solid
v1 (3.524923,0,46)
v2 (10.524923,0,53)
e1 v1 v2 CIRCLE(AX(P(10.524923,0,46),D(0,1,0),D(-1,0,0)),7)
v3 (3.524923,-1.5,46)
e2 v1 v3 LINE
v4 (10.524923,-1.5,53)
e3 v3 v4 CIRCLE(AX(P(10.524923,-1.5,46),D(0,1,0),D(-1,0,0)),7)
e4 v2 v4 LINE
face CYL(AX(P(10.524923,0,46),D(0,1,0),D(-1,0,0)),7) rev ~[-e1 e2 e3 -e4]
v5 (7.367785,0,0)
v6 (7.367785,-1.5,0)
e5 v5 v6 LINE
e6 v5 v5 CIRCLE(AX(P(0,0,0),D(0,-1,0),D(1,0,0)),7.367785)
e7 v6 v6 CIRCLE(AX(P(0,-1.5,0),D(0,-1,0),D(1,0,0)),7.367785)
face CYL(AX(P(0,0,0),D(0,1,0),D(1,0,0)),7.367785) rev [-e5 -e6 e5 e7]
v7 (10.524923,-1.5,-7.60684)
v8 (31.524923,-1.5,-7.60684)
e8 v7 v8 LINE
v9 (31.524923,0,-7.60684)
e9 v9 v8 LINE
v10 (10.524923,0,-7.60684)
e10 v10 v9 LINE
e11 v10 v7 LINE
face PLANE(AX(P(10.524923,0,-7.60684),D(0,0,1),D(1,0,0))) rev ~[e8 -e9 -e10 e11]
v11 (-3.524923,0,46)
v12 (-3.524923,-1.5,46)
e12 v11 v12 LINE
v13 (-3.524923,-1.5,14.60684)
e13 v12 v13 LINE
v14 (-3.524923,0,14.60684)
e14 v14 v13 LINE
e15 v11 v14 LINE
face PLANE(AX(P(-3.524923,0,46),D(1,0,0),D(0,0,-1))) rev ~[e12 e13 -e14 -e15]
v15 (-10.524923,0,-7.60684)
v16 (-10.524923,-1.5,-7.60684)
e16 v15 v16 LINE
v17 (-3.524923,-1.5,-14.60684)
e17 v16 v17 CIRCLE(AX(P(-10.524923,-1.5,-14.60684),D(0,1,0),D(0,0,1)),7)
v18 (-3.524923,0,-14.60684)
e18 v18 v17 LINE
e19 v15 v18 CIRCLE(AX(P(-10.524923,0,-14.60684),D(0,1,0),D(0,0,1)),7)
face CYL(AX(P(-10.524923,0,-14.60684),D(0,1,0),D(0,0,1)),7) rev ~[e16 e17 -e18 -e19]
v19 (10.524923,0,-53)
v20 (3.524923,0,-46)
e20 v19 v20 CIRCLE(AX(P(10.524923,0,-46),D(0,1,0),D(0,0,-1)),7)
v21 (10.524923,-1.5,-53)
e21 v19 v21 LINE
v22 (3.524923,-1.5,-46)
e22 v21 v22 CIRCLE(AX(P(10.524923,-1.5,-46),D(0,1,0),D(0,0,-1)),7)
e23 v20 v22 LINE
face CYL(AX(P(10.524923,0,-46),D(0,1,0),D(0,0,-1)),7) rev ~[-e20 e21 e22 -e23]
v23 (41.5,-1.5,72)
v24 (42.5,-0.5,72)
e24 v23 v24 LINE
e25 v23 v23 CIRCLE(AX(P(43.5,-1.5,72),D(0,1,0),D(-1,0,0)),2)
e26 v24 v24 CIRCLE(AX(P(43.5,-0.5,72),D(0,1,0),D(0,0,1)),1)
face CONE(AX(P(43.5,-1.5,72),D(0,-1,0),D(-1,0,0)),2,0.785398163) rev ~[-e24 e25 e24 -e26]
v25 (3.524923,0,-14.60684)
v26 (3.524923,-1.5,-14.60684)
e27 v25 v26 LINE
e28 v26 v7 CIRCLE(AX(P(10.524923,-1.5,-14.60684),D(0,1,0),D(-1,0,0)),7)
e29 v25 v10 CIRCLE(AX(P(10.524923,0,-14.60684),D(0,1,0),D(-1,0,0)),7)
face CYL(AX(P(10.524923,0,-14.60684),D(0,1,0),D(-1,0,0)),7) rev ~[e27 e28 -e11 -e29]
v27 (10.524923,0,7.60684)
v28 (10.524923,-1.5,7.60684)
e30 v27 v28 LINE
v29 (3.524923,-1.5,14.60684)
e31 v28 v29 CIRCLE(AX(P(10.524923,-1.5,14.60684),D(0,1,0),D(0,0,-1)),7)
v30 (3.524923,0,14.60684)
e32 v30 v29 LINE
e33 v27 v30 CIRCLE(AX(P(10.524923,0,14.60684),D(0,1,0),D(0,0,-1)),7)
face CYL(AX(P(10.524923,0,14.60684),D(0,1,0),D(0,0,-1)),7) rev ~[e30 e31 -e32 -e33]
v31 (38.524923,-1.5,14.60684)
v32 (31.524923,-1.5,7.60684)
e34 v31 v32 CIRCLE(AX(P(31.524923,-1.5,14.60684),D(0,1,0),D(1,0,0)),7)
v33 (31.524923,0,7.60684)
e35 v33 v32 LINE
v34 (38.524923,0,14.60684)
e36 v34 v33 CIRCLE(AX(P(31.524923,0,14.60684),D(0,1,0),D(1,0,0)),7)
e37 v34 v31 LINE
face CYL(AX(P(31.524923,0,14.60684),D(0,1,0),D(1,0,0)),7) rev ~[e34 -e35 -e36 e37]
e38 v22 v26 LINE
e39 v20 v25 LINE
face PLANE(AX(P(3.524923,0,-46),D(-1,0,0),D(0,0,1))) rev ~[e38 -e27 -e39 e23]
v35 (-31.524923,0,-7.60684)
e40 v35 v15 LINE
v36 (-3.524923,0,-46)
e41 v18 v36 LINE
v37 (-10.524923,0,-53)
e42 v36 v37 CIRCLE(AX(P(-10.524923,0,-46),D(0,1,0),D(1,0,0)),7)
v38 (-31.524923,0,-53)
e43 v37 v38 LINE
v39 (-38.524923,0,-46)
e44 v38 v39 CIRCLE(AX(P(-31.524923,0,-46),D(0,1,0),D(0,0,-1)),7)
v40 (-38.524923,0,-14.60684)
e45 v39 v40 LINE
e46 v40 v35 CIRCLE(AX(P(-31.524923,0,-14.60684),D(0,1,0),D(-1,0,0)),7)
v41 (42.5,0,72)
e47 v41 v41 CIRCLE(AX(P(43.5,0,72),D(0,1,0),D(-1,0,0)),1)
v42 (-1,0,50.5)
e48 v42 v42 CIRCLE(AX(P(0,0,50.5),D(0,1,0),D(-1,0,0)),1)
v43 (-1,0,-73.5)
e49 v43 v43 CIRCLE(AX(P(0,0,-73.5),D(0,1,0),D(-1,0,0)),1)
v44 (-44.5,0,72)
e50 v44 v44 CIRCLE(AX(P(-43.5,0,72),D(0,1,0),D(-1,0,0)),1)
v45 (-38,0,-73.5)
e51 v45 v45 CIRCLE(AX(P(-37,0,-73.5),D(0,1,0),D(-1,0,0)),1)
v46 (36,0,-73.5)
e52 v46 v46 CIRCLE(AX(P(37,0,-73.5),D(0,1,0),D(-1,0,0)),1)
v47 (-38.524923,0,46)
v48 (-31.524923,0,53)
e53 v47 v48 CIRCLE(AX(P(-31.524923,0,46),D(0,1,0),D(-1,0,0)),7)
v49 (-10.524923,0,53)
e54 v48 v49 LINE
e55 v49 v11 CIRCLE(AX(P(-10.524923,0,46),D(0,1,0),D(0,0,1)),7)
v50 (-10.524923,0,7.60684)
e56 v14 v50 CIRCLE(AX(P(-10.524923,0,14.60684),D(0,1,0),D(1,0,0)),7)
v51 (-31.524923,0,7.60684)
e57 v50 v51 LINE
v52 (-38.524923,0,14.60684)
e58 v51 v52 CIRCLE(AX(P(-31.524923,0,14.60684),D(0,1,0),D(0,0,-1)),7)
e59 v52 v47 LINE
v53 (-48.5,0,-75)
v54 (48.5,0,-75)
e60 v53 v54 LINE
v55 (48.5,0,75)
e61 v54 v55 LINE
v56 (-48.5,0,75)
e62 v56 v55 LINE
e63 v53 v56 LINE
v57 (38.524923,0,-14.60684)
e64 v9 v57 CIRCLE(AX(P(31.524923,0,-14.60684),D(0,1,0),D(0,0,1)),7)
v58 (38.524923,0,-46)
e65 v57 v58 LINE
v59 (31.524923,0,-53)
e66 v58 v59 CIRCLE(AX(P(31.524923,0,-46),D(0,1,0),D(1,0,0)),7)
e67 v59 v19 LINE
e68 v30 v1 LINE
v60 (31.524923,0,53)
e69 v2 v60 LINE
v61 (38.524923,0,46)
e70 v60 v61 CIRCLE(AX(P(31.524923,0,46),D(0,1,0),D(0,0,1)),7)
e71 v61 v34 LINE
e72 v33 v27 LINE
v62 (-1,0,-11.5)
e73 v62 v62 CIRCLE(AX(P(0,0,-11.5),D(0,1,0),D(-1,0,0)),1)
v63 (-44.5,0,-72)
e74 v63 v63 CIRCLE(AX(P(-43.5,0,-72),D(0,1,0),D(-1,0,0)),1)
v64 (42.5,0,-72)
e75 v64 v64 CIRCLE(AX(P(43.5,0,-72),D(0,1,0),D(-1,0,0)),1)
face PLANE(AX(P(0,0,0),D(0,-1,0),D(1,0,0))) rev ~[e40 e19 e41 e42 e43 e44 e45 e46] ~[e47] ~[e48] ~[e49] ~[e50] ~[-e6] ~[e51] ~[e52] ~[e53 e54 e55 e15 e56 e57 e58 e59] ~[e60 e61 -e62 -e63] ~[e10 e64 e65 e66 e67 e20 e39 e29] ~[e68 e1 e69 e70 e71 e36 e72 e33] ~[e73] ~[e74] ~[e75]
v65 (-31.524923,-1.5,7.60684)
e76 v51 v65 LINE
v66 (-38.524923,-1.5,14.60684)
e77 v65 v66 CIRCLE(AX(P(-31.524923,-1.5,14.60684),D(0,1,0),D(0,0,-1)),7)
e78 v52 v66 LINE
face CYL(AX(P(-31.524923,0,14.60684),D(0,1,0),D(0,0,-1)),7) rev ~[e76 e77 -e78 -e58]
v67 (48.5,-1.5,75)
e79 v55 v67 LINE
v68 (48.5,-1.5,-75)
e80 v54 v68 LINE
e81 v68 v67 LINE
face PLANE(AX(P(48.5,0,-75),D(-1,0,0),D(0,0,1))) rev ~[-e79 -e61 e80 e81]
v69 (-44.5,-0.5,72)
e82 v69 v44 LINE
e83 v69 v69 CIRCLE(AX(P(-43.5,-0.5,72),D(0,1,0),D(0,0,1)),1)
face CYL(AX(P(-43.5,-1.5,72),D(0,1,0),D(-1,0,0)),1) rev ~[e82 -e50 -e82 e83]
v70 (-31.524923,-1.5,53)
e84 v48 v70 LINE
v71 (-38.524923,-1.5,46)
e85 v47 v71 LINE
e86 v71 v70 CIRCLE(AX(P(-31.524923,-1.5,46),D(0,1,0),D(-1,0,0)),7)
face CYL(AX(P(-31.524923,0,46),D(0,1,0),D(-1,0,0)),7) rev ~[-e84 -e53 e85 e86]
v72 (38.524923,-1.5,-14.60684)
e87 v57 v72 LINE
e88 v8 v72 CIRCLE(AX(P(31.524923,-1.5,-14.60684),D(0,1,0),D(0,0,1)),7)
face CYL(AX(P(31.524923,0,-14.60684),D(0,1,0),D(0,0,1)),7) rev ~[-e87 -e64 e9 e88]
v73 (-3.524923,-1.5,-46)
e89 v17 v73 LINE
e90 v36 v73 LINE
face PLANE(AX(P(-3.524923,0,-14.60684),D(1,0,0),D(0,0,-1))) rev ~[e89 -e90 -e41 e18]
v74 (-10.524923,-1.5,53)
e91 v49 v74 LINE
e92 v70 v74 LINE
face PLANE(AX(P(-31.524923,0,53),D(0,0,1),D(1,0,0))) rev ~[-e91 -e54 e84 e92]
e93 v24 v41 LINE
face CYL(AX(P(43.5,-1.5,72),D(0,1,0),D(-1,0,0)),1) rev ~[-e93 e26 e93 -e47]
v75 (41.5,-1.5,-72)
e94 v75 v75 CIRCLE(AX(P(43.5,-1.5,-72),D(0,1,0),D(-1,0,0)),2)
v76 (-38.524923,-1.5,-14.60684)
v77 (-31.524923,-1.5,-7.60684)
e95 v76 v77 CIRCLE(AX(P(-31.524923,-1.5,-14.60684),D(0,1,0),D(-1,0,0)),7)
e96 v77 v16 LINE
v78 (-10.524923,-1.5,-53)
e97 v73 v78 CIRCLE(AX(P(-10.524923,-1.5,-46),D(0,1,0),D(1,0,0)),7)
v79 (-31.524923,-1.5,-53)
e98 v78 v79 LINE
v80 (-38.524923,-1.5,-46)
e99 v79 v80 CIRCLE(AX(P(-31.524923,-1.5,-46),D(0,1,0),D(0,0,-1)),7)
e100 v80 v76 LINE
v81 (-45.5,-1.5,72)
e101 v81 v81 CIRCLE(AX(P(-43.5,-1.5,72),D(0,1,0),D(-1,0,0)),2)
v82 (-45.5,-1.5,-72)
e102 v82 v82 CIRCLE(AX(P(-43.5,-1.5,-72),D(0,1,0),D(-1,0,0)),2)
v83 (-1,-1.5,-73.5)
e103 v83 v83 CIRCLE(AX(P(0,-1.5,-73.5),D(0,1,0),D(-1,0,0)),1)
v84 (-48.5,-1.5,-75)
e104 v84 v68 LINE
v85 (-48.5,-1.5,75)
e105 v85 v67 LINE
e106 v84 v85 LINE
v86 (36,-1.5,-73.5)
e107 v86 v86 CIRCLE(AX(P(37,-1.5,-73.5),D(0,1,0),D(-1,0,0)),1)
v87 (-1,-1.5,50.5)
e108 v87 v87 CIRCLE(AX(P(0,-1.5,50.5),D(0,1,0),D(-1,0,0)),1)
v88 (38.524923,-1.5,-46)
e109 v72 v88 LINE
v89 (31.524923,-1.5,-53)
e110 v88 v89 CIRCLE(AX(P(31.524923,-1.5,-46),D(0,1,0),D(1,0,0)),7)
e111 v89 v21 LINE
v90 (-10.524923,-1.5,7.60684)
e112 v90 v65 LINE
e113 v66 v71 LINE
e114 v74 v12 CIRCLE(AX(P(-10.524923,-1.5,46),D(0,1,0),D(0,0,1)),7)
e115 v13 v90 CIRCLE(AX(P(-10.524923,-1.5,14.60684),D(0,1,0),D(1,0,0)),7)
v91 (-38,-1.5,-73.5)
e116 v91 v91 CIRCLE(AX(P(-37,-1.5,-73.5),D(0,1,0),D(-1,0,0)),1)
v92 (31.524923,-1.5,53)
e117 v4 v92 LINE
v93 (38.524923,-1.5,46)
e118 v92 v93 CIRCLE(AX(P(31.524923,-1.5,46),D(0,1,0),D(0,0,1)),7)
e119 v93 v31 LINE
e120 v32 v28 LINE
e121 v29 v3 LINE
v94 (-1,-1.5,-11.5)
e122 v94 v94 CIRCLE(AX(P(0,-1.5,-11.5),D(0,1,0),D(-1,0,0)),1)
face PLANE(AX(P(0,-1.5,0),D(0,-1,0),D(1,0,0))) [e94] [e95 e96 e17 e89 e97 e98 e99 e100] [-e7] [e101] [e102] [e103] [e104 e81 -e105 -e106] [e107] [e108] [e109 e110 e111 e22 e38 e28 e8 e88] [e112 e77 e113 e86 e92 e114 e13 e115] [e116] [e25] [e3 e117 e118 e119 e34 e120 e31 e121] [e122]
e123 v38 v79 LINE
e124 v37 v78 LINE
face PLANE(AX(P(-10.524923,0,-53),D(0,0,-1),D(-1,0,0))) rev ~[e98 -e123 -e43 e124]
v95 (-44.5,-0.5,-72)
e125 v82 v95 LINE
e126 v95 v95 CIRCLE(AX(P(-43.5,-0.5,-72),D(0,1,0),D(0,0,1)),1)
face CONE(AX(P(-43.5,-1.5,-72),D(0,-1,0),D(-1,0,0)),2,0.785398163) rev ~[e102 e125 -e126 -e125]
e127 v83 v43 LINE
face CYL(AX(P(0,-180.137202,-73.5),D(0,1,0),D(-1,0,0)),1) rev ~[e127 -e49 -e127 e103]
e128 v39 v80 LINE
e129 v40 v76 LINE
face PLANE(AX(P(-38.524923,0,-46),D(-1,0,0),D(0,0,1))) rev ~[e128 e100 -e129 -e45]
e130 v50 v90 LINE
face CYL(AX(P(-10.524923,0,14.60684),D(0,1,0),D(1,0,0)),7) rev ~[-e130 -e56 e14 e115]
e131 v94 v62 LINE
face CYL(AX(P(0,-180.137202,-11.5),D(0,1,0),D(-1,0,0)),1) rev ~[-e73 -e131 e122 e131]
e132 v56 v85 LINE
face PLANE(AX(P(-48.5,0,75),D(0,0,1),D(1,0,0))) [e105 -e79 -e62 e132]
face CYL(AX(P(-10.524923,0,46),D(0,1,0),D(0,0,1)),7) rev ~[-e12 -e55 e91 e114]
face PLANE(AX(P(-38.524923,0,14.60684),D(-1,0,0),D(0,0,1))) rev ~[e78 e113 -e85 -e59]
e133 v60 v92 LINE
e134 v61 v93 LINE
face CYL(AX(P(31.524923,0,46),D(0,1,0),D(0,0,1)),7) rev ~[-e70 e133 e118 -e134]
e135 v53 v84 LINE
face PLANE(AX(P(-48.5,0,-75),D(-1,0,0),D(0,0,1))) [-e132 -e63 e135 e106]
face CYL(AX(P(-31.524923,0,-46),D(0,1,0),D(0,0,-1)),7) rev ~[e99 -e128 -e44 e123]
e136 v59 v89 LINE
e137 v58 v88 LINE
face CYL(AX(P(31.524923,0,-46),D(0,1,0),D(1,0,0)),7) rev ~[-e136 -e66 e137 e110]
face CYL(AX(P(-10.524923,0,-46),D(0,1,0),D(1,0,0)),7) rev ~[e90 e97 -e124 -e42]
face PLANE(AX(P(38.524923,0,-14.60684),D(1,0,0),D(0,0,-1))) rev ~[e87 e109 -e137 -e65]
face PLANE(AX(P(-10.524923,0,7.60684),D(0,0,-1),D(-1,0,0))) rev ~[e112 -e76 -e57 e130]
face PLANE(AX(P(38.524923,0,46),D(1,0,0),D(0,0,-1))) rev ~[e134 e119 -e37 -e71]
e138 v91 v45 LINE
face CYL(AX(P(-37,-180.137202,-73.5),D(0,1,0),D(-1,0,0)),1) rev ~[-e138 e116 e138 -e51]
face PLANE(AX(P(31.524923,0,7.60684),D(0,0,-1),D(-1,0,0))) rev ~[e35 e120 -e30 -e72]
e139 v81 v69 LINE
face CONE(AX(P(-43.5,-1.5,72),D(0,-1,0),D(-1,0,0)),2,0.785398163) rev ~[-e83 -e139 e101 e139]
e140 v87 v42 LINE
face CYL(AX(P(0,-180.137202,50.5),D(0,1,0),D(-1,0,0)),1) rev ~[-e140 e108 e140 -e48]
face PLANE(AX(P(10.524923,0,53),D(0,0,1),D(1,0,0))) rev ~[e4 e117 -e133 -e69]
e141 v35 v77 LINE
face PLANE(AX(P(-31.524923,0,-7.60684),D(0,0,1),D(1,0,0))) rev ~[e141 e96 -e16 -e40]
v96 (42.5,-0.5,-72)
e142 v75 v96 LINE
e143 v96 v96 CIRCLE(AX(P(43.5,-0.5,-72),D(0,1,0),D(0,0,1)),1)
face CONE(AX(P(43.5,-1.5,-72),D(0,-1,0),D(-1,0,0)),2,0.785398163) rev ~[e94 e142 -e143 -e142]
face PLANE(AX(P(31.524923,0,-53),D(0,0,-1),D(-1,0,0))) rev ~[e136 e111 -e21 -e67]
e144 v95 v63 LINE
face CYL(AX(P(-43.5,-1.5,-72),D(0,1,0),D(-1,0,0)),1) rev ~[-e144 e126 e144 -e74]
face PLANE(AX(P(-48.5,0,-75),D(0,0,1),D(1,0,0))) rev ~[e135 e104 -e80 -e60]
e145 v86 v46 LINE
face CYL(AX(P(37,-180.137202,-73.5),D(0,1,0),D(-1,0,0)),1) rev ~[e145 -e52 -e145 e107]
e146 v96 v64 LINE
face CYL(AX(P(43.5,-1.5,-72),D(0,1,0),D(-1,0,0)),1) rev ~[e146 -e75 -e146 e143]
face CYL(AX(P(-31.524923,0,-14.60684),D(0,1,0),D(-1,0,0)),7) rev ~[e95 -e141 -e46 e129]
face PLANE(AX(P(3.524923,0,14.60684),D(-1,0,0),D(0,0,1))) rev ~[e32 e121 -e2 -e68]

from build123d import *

# Parameters (mm, degrees)
F0_W           = 97
F0_H           = 150
F0_R           = 7.367785
F1_DEPTH       = 1.5
F3_D           = 2
F3_CSINK_D     = 4
F3_CSINK_ANGLE = 90
F5_D           = 2


# Not quite as in the source:
# - a feature names something its author has since deleted; it is built from what else it names


with BuildPart() as f1:
    # F0 (on Front) → F1 (new body)
    with BuildSketch(Plane.XZ):
        Rectangle(F0_W, F0_H)
        with BuildLine():
            Line((-31.5249225795, -7.60684), (-10.5249225795, -7.60684))
            ThreePointArc((-10.5249225795, -7.60684), (-5.5751751112, -9.6570925317), (-3.5249225795, -14.60684))
            Line((-3.5249225795, -14.60684), (-3.5249225795, -46))
            ThreePointArc((-3.5249225795, -46), (-5.5751751112, -50.9497474683), (-10.5249225795, -53))
            Line((-10.5249225795, -53), (-31.5249225795, -53))
            ThreePointArc((-31.5249225795, -53), (-36.4746700478, -50.9497474683), (-38.5249225795, -46))
            Line((-38.5249225795, -46), (-38.5249225795, -14.60684))
            ThreePointArc((-38.5249225795, -14.60684), (-36.4746700478, -9.6570925317), (-31.5249225795, -7.60684))
        make_face(mode=Mode.SUBTRACT)
        with BuildLine():
            ThreePointArc((38.5249225795, -46), (36.4746700478, -50.9497474683), (31.5249225795, -53))
            Line((31.5249225795, -53), (10.5249225795, -53))
            ThreePointArc((10.5249225795, -53), (5.5751751112, -50.9497474683), (3.5249225795, -46))
            Line((3.5249225795, -46), (3.5249225795, -14.60684))
            ThreePointArc((3.5249225795, -14.60684), (5.5751751112, -9.6570925317), (10.5249225795, -7.60684))
            Line((10.5249225795, -7.60684), (31.5249225795, -7.60684))
            ThreePointArc((31.5249225795, -7.60684), (36.4746700478, -9.6570925317), (38.5249225795, -14.60684))
            Line((38.5249225795, -14.60684), (38.5249225795, -46))
        make_face(mode=Mode.SUBTRACT)
        with BuildLine():
            ThreePointArc((-3.5249225795, 14.60684), (-5.5751751112, 9.6570925317), (-10.5249225795, 7.60684))
            Line((-10.5249225795, 7.60684), (-31.5249225795, 7.60684))
            ThreePointArc((-31.5249225795, 7.60684), (-36.4746700478, 9.6570925317), (-38.5249225795, 14.60684))
            Line((-38.5249225795, 14.60684), (-38.5249225795, 46))
            ThreePointArc((-38.5249225795, 46), (-36.4746700478, 50.9497474683), (-31.5249225795, 53))
            Line((-31.5249225795, 53), (-10.5249225795, 53))
            ThreePointArc((-10.5249225795, 53), (-5.5751751112, 50.9497474683), (-3.5249225795, 46))
            Line((-3.5249225795, 46), (-3.5249225795, 14.60684))
        make_face(mode=Mode.SUBTRACT)
        Circle(F0_R, mode=Mode.SUBTRACT)
        with BuildLine():
            ThreePointArc((10.5249225795, 7.60684), (5.5751751112, 9.6570925317), (3.5249225795, 14.60684))
            Line((3.5249225795, 14.60684), (3.5249225795, 46))
            ThreePointArc((3.5249225795, 46), (5.5751751112, 50.9497474683), (10.5249225795, 53))
            Line((10.5249225795, 53), (31.5249225795, 53))
            ThreePointArc((31.5249225795, 53), (36.4746700478, 50.9497474683), (38.5249225795, 46))
            Line((38.5249225795, 46), (38.5249225795, 14.60684))
            ThreePointArc((38.5249225795, 14.60684), (36.4746700478, 9.6570925317), (31.5249225795, 7.60684))
            Line((31.5249225795, 7.60684), (10.5249225795, 7.60684))
        make_face(mode=Mode.SUBTRACT)
    extrude(amount=F1_DEPTH)

    # F3 (through all)
    with Locations(Plane.XZ.offset(1.5)):
        with Locations((-43.5, -72), (43.5, -72), (43.5, 72), (-43.5, 72)):
            CounterSinkHole(F3_D / 2, F3_CSINK_D / 2, counter_sink_angle=F3_CSINK_ANGLE)

    # F5 (through all)
    with Locations(Plane.XZ.offset(1.5)):
        with Locations((-37, -73.5), (0, -73.5), (37, -73.5), (0, -11.5), (0, 50.5)):
            Hole(F5_D / 2)


solid = f1.part
